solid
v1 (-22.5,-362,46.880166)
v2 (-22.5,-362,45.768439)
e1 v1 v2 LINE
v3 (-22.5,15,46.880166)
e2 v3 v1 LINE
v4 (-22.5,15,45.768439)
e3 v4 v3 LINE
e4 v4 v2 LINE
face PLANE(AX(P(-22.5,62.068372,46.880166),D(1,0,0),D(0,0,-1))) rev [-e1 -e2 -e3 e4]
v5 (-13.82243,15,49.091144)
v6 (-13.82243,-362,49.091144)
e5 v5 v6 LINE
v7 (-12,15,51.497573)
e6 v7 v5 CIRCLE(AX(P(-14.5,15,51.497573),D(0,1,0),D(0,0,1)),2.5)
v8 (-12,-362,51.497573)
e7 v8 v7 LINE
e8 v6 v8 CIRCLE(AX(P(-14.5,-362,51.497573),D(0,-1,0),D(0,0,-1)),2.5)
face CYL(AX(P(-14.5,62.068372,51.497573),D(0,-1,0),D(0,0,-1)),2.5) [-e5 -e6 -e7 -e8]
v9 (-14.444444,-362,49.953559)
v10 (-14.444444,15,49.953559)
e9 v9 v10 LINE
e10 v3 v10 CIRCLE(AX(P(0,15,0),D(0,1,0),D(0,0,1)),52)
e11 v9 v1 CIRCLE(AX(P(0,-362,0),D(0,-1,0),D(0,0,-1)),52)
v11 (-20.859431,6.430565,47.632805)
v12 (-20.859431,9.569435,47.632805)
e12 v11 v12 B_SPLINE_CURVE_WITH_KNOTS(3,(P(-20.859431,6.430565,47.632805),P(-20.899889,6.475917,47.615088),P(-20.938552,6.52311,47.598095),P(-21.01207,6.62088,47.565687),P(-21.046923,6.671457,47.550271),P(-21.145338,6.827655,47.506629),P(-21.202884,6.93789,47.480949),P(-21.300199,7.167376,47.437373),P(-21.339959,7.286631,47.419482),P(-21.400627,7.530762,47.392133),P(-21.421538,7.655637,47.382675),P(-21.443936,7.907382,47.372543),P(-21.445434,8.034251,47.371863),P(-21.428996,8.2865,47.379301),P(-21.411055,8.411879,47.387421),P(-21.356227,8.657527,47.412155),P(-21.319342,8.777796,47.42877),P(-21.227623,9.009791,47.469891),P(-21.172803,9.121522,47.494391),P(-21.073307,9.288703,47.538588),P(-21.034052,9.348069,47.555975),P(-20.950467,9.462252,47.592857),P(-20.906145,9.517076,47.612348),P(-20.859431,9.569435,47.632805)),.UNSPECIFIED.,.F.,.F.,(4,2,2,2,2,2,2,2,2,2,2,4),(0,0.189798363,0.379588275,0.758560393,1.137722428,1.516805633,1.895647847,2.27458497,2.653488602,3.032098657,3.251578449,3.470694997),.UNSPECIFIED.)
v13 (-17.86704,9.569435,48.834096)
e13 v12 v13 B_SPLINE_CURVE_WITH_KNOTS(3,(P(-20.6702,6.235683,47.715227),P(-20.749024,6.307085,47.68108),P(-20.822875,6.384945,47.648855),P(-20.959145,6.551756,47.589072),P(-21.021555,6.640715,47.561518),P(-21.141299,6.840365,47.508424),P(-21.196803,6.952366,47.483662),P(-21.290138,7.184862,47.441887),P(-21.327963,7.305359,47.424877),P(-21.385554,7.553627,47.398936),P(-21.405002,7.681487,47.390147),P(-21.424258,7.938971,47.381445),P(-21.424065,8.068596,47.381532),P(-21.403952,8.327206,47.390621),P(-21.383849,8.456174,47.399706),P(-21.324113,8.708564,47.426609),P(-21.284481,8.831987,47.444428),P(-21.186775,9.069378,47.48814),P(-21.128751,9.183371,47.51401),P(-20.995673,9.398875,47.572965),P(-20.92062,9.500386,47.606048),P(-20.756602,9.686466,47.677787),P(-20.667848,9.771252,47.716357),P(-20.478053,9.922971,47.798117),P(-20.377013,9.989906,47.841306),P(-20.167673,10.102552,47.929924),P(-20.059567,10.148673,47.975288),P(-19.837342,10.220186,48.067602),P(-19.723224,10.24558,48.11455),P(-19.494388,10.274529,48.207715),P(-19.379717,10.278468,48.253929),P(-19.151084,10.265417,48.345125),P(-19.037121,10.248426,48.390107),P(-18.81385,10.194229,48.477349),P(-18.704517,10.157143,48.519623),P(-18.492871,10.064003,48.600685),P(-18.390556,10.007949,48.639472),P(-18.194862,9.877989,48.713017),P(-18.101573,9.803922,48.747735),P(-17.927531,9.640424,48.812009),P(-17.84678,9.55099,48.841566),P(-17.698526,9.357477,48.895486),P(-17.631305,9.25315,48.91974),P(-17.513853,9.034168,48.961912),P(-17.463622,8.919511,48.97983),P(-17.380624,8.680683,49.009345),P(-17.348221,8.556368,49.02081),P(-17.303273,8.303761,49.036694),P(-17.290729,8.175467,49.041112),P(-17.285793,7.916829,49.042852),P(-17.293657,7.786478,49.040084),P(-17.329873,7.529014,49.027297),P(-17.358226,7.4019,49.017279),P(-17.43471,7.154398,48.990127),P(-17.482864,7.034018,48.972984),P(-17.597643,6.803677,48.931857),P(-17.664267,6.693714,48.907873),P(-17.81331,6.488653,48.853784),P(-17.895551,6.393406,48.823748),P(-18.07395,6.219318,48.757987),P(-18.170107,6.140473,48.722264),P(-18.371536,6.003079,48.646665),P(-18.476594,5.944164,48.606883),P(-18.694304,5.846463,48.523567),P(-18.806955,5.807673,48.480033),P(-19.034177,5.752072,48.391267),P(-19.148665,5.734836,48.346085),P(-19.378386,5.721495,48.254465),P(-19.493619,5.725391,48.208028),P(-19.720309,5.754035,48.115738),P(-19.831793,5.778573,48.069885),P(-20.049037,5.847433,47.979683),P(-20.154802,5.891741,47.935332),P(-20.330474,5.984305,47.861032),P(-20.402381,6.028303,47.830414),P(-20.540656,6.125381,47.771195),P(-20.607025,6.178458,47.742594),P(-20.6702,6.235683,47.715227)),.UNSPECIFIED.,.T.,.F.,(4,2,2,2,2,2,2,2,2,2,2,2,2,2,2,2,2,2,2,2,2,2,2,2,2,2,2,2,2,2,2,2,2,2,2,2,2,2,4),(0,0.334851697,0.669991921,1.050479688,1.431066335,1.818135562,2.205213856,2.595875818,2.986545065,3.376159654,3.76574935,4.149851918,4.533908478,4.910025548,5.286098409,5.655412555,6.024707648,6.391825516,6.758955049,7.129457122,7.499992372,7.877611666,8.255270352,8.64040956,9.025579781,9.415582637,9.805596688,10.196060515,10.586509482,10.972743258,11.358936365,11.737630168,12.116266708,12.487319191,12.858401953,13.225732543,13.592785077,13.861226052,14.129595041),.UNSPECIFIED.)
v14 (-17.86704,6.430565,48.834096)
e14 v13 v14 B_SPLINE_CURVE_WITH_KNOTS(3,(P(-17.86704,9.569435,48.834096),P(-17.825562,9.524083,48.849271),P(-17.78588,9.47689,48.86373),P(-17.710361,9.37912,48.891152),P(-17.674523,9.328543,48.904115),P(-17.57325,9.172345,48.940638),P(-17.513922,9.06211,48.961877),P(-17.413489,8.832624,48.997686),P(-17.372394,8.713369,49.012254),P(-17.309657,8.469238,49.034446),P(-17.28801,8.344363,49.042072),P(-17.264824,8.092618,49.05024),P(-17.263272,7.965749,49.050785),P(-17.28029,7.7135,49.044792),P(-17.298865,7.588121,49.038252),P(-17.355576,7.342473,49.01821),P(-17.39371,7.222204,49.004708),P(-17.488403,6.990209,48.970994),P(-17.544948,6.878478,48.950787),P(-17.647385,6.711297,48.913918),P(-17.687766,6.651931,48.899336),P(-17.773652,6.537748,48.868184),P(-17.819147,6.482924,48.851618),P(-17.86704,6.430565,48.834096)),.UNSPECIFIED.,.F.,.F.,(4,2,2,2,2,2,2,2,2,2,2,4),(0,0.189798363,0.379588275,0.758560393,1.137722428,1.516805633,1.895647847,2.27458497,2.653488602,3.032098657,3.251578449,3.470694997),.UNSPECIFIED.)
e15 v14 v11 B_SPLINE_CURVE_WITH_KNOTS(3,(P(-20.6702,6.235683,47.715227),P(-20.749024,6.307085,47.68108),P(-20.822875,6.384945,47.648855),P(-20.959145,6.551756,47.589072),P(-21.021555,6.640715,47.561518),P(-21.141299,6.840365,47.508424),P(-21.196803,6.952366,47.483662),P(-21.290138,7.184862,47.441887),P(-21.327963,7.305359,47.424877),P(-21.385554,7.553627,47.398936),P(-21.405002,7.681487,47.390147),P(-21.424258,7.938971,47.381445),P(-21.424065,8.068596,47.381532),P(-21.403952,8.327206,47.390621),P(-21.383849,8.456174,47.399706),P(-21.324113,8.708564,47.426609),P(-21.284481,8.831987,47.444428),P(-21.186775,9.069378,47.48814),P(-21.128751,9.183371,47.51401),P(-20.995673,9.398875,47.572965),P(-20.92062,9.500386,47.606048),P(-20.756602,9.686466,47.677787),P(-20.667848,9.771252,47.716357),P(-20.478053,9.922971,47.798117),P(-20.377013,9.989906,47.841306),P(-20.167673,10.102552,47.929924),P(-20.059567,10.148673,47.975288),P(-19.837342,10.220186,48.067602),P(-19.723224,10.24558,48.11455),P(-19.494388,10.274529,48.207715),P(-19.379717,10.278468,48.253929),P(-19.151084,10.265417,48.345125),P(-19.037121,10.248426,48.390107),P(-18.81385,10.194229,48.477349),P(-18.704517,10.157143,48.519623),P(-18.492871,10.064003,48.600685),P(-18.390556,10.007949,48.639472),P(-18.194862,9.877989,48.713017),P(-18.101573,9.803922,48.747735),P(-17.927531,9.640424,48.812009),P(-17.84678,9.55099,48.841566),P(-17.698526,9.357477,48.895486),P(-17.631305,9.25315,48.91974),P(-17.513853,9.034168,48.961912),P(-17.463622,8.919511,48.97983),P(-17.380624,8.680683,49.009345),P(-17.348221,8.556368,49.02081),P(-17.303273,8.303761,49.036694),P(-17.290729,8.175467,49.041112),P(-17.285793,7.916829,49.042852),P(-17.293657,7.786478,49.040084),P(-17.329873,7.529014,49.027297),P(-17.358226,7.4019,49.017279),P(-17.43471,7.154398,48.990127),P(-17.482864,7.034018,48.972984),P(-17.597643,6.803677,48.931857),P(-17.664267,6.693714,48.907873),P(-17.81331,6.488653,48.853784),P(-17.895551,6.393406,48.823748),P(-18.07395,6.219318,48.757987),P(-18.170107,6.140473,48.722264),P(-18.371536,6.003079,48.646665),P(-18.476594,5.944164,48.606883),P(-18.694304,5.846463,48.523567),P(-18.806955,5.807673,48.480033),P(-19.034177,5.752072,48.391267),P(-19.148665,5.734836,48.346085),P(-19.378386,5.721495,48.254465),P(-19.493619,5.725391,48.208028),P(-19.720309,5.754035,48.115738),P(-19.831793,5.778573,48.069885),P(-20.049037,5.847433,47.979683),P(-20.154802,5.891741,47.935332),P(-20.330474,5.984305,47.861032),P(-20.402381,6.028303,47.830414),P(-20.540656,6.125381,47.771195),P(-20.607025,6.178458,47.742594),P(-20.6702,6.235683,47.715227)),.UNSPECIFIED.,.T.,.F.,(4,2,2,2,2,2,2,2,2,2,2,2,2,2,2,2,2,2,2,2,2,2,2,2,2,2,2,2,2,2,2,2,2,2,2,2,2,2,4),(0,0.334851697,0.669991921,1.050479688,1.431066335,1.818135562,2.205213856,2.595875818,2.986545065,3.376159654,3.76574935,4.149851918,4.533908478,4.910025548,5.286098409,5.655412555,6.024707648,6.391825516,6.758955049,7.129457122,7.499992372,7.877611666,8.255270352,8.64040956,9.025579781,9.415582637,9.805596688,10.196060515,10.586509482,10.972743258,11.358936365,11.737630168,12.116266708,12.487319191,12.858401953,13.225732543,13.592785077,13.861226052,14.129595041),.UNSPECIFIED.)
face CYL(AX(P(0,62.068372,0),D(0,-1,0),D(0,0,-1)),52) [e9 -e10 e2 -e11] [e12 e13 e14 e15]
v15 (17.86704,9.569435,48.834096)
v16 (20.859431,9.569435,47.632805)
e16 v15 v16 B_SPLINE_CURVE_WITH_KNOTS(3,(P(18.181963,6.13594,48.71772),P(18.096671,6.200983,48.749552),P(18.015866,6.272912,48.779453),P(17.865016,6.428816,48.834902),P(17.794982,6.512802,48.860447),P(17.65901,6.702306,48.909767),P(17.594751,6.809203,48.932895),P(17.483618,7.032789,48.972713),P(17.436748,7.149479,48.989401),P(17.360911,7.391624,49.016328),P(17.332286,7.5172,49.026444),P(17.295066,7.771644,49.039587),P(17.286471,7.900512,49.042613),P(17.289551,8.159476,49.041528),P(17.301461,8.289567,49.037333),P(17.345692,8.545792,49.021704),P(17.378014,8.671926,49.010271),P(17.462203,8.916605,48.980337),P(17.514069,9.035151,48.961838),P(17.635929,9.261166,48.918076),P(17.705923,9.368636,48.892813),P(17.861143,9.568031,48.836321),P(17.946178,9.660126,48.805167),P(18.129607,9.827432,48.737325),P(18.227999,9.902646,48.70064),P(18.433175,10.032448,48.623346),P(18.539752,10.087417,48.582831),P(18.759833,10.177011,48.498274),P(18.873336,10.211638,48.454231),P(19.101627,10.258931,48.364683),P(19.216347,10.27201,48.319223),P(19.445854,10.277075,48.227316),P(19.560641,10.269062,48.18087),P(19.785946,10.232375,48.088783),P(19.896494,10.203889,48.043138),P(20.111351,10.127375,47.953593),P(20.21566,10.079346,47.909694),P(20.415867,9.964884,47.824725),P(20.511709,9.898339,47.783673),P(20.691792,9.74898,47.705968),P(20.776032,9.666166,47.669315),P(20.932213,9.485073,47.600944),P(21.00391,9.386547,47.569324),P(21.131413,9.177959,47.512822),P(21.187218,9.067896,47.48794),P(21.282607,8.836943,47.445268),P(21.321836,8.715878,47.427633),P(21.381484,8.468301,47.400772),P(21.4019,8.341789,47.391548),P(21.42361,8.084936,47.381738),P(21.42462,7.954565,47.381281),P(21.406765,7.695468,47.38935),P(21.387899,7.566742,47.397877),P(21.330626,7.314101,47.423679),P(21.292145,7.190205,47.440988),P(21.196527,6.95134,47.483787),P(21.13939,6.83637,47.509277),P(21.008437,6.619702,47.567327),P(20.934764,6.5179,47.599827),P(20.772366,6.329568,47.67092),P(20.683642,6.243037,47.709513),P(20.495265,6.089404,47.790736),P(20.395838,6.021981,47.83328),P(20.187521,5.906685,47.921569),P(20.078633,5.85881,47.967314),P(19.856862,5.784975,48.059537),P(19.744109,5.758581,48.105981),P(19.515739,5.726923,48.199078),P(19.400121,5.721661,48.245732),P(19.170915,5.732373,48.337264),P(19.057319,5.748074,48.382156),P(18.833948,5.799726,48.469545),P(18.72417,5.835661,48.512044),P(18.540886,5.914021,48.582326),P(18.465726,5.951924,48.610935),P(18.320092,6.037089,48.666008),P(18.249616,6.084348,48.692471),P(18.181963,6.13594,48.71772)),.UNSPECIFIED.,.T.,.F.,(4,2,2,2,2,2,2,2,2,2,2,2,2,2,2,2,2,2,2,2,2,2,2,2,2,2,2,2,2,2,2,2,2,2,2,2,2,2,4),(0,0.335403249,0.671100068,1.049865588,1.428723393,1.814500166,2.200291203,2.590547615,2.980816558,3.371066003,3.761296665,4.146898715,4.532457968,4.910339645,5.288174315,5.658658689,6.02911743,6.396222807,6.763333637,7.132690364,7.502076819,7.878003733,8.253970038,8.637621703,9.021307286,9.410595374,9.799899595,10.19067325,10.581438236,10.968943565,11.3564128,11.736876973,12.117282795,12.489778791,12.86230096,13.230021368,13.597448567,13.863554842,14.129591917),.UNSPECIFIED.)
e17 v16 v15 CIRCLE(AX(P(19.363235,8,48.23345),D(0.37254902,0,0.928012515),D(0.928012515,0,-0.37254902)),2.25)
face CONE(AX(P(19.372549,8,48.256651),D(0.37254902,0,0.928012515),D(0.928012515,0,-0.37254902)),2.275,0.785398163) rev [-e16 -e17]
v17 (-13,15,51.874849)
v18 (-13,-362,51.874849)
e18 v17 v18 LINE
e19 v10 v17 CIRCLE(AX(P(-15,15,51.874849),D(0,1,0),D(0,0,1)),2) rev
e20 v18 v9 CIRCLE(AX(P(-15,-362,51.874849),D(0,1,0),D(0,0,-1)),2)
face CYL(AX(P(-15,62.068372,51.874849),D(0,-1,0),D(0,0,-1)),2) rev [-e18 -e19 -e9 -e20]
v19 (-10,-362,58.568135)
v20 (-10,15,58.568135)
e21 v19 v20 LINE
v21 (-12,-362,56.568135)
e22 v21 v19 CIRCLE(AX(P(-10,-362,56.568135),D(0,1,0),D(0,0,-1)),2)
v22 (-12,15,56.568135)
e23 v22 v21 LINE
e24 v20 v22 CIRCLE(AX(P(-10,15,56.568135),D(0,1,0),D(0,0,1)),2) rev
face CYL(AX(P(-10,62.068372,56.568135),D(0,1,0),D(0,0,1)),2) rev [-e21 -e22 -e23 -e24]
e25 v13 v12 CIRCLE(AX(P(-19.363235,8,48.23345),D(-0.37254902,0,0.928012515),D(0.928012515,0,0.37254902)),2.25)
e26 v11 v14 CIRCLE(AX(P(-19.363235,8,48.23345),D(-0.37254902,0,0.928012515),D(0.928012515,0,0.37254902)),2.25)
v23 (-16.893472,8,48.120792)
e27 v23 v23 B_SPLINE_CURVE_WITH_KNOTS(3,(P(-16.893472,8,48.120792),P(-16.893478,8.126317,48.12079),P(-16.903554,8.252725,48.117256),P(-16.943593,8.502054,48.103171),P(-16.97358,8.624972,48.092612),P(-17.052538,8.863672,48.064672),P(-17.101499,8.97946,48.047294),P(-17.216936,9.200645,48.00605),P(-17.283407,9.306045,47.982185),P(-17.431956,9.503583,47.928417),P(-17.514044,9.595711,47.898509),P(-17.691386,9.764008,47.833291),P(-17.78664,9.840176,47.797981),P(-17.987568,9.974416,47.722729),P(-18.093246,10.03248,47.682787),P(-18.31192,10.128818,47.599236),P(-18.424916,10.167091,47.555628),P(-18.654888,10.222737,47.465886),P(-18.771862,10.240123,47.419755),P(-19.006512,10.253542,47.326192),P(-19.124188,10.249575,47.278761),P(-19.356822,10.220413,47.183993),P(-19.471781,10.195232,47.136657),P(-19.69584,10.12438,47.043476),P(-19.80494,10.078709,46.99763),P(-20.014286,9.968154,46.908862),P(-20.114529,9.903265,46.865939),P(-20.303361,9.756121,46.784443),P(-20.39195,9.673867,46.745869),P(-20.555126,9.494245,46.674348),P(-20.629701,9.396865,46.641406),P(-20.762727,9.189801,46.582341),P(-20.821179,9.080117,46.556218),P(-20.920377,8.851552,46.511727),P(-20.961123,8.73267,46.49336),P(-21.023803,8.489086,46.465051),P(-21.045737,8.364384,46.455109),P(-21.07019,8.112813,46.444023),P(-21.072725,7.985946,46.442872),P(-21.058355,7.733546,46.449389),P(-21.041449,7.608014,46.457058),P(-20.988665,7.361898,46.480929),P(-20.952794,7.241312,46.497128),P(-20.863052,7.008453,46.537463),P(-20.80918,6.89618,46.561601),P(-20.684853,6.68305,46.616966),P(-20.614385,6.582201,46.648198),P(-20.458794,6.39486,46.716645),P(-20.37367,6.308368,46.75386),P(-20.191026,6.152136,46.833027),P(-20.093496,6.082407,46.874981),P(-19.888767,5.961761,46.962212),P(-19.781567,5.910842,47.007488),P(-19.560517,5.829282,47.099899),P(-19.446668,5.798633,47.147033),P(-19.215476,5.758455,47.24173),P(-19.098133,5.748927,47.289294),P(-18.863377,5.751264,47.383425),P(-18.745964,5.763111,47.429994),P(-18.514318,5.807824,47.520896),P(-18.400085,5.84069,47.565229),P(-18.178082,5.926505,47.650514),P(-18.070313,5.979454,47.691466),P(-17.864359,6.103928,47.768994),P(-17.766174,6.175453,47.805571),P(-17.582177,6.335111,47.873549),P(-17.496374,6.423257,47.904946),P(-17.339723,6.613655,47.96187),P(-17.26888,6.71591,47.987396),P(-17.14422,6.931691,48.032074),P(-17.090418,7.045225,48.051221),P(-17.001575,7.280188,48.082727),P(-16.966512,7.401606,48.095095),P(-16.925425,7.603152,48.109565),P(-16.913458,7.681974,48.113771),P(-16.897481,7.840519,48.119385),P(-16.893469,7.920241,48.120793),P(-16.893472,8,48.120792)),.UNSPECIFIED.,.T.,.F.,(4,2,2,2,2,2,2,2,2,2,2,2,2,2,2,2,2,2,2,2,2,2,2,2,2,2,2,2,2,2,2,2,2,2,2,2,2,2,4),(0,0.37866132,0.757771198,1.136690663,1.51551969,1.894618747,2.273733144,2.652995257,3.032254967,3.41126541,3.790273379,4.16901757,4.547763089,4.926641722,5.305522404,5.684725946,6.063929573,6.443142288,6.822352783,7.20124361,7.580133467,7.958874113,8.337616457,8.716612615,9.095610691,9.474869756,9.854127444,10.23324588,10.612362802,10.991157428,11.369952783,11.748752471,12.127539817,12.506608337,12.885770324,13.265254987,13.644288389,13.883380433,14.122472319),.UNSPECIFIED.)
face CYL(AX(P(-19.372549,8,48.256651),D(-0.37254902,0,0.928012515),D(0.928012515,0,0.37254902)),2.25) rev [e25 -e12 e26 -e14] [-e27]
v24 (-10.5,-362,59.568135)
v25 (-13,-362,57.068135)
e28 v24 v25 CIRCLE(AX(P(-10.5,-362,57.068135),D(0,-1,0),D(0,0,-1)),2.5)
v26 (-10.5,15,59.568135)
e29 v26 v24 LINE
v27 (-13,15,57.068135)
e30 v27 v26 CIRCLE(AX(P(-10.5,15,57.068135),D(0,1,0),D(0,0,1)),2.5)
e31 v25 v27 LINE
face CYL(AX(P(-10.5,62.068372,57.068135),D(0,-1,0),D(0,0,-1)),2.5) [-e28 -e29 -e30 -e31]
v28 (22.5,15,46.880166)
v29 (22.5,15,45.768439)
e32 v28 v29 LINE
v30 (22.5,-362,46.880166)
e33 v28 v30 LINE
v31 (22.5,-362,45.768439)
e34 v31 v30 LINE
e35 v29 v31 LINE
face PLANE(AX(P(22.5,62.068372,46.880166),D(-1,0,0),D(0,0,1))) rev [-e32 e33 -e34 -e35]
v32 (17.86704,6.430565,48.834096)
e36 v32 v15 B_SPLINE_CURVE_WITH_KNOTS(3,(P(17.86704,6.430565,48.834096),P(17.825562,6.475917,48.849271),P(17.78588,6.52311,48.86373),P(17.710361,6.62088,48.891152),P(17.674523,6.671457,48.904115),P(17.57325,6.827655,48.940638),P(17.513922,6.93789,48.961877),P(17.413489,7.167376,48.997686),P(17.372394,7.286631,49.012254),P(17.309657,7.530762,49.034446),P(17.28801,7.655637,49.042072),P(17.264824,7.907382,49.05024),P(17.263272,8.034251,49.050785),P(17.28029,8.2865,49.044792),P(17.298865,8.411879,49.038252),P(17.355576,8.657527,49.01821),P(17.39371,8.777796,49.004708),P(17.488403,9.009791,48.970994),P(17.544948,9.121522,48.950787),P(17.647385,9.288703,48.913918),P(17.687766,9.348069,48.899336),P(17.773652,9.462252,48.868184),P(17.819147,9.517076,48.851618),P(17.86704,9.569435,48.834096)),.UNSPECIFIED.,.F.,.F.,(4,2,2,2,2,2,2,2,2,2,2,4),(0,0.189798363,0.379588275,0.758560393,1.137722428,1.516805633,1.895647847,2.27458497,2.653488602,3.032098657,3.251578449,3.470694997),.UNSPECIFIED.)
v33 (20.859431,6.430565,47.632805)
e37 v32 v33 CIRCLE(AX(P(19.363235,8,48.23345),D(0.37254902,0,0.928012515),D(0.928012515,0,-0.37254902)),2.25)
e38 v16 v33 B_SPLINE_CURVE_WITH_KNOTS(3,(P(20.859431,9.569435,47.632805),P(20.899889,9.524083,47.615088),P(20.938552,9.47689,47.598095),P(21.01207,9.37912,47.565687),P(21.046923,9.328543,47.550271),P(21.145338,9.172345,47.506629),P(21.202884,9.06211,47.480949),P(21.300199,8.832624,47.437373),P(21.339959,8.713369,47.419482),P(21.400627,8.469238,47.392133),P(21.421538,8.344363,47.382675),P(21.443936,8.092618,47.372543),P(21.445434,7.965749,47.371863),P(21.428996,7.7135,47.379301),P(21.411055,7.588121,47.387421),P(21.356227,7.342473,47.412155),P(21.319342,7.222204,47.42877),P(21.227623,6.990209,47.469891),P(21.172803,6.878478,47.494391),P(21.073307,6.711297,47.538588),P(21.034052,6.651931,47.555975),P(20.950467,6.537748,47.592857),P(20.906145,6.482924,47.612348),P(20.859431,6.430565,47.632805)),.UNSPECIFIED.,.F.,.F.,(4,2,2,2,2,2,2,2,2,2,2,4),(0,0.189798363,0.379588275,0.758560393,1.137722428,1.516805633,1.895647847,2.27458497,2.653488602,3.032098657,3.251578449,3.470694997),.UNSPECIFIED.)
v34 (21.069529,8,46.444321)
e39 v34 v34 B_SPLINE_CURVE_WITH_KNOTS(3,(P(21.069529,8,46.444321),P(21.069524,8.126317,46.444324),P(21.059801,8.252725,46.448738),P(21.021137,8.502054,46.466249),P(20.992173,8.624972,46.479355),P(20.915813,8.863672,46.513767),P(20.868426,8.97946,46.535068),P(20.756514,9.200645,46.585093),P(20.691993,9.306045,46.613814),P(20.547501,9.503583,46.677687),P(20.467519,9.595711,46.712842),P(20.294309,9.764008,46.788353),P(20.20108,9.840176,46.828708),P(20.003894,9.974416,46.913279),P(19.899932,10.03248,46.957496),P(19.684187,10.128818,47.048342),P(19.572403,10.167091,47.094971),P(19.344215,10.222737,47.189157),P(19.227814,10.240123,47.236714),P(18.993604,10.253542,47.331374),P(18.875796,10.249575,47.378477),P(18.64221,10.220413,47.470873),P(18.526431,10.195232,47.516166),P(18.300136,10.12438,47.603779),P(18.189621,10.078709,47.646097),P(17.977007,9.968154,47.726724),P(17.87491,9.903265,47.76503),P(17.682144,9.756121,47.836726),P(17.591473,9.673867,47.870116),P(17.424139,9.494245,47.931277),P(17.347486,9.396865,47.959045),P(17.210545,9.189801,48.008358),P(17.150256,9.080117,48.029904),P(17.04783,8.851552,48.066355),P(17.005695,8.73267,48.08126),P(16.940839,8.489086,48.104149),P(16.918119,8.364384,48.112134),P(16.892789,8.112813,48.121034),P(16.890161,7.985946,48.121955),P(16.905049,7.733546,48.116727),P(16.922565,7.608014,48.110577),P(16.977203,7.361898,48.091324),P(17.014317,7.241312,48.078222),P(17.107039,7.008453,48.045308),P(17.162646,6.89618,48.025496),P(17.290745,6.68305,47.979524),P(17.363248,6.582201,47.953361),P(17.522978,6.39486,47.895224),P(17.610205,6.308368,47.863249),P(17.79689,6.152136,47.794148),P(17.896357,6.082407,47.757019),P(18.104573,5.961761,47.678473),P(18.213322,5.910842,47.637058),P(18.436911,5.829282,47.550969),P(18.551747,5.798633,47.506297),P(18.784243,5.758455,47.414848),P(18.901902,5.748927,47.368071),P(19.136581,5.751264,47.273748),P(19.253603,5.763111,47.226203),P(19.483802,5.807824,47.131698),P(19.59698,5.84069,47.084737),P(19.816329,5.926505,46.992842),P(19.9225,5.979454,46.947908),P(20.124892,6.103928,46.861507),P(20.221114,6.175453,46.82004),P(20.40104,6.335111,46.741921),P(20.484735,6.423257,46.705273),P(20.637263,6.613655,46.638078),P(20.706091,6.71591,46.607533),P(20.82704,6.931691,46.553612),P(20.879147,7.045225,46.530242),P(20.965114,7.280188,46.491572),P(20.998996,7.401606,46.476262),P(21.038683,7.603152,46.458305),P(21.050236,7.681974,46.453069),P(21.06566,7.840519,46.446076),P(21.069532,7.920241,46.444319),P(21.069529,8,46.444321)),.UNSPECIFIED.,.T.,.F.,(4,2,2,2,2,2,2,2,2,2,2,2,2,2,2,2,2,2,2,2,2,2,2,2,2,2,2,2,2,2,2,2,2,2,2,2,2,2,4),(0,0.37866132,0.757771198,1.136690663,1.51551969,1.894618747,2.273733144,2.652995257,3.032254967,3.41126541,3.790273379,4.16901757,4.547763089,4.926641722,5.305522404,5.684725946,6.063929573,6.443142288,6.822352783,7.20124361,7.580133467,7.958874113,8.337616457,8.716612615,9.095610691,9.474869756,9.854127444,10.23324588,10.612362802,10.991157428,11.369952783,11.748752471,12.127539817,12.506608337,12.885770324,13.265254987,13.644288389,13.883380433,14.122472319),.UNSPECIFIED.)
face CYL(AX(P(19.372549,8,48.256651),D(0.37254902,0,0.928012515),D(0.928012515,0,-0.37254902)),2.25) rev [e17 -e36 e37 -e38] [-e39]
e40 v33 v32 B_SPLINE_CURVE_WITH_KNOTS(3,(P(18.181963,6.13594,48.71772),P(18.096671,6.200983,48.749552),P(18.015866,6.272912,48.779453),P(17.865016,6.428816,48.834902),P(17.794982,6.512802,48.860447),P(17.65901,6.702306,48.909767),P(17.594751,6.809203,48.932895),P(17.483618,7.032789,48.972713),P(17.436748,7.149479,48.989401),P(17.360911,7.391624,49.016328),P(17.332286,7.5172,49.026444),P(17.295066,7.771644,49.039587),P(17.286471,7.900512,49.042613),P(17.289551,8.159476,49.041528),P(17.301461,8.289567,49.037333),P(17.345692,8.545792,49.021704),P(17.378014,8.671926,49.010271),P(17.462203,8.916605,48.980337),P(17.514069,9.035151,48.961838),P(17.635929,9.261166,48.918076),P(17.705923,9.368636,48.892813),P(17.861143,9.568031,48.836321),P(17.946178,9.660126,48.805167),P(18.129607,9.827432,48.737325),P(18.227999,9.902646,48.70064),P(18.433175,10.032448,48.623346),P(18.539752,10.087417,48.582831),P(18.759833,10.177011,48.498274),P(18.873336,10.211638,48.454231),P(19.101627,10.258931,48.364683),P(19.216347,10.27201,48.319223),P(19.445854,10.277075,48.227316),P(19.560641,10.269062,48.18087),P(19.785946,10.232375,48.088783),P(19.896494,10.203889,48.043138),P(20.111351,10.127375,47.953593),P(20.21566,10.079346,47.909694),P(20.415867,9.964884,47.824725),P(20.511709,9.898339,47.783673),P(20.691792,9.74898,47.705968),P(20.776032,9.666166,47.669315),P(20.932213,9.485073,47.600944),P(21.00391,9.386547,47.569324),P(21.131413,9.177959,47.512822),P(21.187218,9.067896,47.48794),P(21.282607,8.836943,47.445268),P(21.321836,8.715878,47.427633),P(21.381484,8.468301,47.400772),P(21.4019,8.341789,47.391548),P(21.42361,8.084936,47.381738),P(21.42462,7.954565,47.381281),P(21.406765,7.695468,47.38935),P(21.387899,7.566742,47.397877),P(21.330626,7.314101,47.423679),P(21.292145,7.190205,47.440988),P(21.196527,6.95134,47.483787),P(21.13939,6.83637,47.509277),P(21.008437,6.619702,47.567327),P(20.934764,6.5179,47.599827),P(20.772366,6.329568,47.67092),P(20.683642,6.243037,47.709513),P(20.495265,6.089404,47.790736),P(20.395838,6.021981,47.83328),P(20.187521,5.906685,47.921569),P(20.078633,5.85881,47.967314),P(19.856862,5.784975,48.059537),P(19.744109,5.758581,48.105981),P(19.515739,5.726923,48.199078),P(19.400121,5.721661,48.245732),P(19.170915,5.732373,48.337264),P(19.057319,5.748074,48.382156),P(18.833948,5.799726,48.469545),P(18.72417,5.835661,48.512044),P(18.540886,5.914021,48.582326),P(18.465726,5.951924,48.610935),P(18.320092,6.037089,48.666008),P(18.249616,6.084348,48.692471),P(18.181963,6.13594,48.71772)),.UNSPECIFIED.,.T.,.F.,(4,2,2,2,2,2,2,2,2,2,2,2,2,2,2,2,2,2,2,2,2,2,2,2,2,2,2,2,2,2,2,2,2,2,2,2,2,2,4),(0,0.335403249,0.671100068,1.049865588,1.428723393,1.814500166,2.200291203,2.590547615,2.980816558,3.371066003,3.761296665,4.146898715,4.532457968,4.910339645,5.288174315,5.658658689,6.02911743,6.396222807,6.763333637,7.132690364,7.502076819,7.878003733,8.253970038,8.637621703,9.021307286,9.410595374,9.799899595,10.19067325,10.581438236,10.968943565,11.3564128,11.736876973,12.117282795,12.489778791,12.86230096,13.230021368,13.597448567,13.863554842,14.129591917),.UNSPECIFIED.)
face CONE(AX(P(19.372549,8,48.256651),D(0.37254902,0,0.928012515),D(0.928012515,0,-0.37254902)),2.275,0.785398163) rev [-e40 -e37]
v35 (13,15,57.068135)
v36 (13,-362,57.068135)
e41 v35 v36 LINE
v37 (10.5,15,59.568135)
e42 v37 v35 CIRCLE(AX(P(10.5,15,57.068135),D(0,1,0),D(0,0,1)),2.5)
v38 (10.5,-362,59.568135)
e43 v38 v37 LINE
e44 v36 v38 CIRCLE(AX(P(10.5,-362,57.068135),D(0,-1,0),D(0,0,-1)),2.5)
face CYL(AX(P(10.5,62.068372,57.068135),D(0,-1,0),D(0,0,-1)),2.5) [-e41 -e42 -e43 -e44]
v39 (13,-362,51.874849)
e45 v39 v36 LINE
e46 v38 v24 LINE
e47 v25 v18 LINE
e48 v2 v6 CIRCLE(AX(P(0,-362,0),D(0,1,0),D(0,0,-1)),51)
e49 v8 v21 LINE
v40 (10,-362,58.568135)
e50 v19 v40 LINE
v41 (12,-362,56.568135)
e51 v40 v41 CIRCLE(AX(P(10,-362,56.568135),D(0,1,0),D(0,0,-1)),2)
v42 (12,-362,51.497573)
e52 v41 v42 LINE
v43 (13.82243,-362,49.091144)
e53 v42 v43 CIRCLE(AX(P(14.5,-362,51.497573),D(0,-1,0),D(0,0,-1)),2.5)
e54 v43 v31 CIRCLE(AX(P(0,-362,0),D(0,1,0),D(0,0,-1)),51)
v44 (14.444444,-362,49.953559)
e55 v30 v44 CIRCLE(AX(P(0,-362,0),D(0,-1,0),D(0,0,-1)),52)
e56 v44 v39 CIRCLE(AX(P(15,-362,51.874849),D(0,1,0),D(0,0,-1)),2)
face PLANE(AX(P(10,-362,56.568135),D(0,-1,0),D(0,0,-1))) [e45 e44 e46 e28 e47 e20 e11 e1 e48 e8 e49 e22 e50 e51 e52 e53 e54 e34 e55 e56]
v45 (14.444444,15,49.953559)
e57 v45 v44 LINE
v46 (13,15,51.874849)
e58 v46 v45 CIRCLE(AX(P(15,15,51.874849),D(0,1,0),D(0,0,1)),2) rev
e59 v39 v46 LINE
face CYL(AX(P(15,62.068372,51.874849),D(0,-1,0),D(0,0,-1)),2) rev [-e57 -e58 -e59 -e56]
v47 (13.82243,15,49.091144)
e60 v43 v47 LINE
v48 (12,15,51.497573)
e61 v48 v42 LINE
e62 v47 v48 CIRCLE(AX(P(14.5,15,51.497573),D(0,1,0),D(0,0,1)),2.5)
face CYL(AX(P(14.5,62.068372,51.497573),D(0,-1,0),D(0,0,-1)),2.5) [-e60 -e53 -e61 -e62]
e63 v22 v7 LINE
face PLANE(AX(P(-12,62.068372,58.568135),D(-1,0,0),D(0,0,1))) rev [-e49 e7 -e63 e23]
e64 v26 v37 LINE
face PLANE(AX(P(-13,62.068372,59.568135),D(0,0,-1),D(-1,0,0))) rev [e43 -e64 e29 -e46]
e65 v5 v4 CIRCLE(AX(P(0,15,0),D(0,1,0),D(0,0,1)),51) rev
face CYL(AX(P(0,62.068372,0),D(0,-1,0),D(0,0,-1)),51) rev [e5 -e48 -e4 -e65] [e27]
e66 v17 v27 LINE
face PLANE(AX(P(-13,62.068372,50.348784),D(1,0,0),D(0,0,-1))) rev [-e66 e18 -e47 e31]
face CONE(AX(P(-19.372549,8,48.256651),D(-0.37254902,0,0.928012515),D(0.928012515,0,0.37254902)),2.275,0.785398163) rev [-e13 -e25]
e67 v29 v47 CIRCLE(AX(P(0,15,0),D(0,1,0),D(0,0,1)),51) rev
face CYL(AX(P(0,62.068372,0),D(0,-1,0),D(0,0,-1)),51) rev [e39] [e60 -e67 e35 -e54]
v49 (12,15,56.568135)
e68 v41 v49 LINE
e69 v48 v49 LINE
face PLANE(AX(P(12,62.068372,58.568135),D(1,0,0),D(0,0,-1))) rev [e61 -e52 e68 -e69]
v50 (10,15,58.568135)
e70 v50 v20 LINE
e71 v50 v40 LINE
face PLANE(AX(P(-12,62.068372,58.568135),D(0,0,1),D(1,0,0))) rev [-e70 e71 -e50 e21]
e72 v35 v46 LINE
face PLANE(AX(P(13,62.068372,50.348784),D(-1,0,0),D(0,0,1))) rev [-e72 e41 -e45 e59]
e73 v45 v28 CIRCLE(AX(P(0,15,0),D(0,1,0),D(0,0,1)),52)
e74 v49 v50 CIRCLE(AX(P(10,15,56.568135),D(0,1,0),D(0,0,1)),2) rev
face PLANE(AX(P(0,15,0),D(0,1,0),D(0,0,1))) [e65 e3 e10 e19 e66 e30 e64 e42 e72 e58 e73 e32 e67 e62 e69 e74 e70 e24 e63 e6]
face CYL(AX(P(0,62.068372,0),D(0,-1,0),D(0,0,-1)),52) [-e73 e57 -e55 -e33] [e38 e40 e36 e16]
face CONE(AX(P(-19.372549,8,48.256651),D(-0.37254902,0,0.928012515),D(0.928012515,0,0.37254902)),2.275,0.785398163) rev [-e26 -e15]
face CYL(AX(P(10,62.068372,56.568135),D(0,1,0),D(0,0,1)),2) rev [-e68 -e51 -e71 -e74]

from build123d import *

# Parameters (mm, degrees)
EXTRUDE_1_DEPTH = 15
FILLET_1_R      = 2
FILLET_2_R      = 2.5
EXTRUDE_2_DEPTH = 362


# Read off the part's stored shape, not the designer's step: Отверстие с зазором M41
with BuildPart() as part:
    # Эскиз1 → Бобышка-Вытянуть1 (new body)
    with BuildSketch(Plane(origin=(0, 0, 0), x_dir=(1, 0, 0), z_dir=(0, 1, 0))):
        with BuildLine():
            Line((-22.5, -46.880166382), (-22.5, -45.768438907))
            ThreePointArc((-22.5, -45.768438907), (-17.354305588, -47.956522784), (-12, -49.568134926))
            Line((-12, -49.568134926), (-12, -58.568134926))
            Line((-12, -58.568134926), (12, -58.568134926))
            Line((12, -58.568134926), (12, -49.568134926))
            ThreePointArc((12, -49.568134926), (17.354305588, -47.956522784), (22.5, -45.768438907))
            Line((22.5, -45.768438907), (22.5, -46.880166382))
            ThreePointArc((22.5, -46.880166382), (17.834526239, -48.845979096), (13, -50.348783501))
            Line((13, -50.348783501), (13, -59.568134926))
            Line((13, -59.568134926), (-13, -59.568134926))
            Line((-13, -59.568134926), (-13, -50.348783501))
            ThreePointArc((-13, -50.348783501), (-17.834526239, -48.845979096), (-22.5, -46.880166382))
        make_face()
    extrude(amount=EXTRUDE_1_DEPTH)

    # Скругление1
    fillet_1_edges = [part.edges().sort_by_distance(p)[0] for p in [
        (-13, 7.5, 50.348783501),
        (13, 7.5, 50.348783501),
        (12, 7.5, 58.568134926),
        (-12, 7.5, 58.568134926),
    ]]
    fillet(fillet_1_edges, radius=FILLET_1_R)

    # Скругление2
    fillet_2_edges = [part.edges().sort_by_distance(p)[0] for p in [
        (-12, 7.5, 49.568134926),
        (-13, 7.5, 59.568134926),
        (13, 7.5, 59.568134926),
        (12, 7.5, 49.568134926),
    ]]
    fillet(fillet_2_edges, radius=FILLET_2_R)

    # Отверстие с зазором M41 outline → Отверстие с зазором M41 (revolve, cut)
    with BuildSketch(Plane(origin=(0, 8, 0), x_dir=(0.9280125149960182, 0, -0.37254901960784303), z_dir=(0, -1, 0))):
        Polygon((2.25, 52.000021479), (2.25, 51.975), (2.275021479, 52.000021479), align=None)
        Polygon((2.25, 50.950316764), (2.25, 51.975), (2.25, 52.000021479), (0, 52.000021479), (0, 50.950316764), align=None)
    revolve(axis=Axis((0, 8, 0), (0.37254901960784303, 0, 0.9280125149960182)), mode=Mode.SUBTRACT)

    # Hole Wizard M41 2 outline → Hole Wizard M41 2 (revolve, cut)
    with BuildSketch(Plane(origin=(0, 8, 0), x_dir=(0.9280125149960182, 0, 0.37254901960784303), z_dir=(0, 1, 0))):
        Polygon((2.25, -52.000019282), (2.25, -51.975), (2.25, -50.950316764), (0, -50.950316764), (0, -52.000019282), align=None)
        Polygon((2.275019282, -52.000019282), (2.249998249, -51.974998249), (2.25, -52.000019282), align=None)
    revolve(axis=Axis((0, 8, 0), (0.37254901960784303, 0, -0.9280125149960182)), mode=Mode.SUBTRACT)

    # Эскиз3 → Бобышка-Вытянуть2 (add)
    with BuildSketch(Plane.XZ):
        with BuildLine():
            Line((12, 56.568134926), (12, 51.497572758))
            ThreePointArc((12, 51.497572758), (12.507021672, 49.988255899), (13.822429907, 49.091144125))
            ThreePointArc((13.822429907, 49.091144125), (18.237045294, 47.627829878), (22.5, 45.768438907))
            Line((22.5, 45.768438907), (22.5, 46.880166382))
            ThreePointArc((22.5, 46.880166382), (18.536030559, 48.584108216), (14.444444444, 49.953558679))
            ThreePointArc((14.444444444, 49.953558679), (13.401389492, 50.672998972), (13, 51.874849397))
            Line((13, 51.874849397), (13, 57.068134926))
            ThreePointArc((13, 57.068134926), (12.267766953, 58.835901879), (10.5, 59.568134926))
            Line((10.5, 59.568134926), (-10.5, 59.568134926))
            ThreePointArc((-10.5, 59.568134926), (-12.267766953, 58.835901879), (-13, 57.068134926))
            Line((-13, 57.068134926), (-13, 51.874849397))
            ThreePointArc((-13, 51.874849397), (-13.401389492, 50.672998972), (-14.444444444, 49.953558679))
            ThreePointArc((-14.444444444, 49.953558679), (-18.536030559, 48.584108216), (-22.5, 46.880166382))
            Line((-22.5, 46.880166382), (-22.5, 45.768438907))
            ThreePointArc((-22.5, 45.768438907), (-18.237045294, 47.627829878), (-13.822429907, 49.091144125))
            ThreePointArc((-13.822429907, 49.091144125), (-12.507021672, 49.988255899), (-12, 51.497572758))
            Line((-12, 51.497572758), (-12, 56.568134926))
            ThreePointArc((-12, 56.568134926), (-11.414213562, 57.982348488), (-10, 58.568134926))
            Line((-10, 58.568134926), (10, 58.568134926))
            ThreePointArc((10, 58.568134926), (11.414213562, 57.982348488), (12, 56.568134926))
        make_face()
    extrude(amount=EXTRUDE_2_DEPTH)


solid = part.part
